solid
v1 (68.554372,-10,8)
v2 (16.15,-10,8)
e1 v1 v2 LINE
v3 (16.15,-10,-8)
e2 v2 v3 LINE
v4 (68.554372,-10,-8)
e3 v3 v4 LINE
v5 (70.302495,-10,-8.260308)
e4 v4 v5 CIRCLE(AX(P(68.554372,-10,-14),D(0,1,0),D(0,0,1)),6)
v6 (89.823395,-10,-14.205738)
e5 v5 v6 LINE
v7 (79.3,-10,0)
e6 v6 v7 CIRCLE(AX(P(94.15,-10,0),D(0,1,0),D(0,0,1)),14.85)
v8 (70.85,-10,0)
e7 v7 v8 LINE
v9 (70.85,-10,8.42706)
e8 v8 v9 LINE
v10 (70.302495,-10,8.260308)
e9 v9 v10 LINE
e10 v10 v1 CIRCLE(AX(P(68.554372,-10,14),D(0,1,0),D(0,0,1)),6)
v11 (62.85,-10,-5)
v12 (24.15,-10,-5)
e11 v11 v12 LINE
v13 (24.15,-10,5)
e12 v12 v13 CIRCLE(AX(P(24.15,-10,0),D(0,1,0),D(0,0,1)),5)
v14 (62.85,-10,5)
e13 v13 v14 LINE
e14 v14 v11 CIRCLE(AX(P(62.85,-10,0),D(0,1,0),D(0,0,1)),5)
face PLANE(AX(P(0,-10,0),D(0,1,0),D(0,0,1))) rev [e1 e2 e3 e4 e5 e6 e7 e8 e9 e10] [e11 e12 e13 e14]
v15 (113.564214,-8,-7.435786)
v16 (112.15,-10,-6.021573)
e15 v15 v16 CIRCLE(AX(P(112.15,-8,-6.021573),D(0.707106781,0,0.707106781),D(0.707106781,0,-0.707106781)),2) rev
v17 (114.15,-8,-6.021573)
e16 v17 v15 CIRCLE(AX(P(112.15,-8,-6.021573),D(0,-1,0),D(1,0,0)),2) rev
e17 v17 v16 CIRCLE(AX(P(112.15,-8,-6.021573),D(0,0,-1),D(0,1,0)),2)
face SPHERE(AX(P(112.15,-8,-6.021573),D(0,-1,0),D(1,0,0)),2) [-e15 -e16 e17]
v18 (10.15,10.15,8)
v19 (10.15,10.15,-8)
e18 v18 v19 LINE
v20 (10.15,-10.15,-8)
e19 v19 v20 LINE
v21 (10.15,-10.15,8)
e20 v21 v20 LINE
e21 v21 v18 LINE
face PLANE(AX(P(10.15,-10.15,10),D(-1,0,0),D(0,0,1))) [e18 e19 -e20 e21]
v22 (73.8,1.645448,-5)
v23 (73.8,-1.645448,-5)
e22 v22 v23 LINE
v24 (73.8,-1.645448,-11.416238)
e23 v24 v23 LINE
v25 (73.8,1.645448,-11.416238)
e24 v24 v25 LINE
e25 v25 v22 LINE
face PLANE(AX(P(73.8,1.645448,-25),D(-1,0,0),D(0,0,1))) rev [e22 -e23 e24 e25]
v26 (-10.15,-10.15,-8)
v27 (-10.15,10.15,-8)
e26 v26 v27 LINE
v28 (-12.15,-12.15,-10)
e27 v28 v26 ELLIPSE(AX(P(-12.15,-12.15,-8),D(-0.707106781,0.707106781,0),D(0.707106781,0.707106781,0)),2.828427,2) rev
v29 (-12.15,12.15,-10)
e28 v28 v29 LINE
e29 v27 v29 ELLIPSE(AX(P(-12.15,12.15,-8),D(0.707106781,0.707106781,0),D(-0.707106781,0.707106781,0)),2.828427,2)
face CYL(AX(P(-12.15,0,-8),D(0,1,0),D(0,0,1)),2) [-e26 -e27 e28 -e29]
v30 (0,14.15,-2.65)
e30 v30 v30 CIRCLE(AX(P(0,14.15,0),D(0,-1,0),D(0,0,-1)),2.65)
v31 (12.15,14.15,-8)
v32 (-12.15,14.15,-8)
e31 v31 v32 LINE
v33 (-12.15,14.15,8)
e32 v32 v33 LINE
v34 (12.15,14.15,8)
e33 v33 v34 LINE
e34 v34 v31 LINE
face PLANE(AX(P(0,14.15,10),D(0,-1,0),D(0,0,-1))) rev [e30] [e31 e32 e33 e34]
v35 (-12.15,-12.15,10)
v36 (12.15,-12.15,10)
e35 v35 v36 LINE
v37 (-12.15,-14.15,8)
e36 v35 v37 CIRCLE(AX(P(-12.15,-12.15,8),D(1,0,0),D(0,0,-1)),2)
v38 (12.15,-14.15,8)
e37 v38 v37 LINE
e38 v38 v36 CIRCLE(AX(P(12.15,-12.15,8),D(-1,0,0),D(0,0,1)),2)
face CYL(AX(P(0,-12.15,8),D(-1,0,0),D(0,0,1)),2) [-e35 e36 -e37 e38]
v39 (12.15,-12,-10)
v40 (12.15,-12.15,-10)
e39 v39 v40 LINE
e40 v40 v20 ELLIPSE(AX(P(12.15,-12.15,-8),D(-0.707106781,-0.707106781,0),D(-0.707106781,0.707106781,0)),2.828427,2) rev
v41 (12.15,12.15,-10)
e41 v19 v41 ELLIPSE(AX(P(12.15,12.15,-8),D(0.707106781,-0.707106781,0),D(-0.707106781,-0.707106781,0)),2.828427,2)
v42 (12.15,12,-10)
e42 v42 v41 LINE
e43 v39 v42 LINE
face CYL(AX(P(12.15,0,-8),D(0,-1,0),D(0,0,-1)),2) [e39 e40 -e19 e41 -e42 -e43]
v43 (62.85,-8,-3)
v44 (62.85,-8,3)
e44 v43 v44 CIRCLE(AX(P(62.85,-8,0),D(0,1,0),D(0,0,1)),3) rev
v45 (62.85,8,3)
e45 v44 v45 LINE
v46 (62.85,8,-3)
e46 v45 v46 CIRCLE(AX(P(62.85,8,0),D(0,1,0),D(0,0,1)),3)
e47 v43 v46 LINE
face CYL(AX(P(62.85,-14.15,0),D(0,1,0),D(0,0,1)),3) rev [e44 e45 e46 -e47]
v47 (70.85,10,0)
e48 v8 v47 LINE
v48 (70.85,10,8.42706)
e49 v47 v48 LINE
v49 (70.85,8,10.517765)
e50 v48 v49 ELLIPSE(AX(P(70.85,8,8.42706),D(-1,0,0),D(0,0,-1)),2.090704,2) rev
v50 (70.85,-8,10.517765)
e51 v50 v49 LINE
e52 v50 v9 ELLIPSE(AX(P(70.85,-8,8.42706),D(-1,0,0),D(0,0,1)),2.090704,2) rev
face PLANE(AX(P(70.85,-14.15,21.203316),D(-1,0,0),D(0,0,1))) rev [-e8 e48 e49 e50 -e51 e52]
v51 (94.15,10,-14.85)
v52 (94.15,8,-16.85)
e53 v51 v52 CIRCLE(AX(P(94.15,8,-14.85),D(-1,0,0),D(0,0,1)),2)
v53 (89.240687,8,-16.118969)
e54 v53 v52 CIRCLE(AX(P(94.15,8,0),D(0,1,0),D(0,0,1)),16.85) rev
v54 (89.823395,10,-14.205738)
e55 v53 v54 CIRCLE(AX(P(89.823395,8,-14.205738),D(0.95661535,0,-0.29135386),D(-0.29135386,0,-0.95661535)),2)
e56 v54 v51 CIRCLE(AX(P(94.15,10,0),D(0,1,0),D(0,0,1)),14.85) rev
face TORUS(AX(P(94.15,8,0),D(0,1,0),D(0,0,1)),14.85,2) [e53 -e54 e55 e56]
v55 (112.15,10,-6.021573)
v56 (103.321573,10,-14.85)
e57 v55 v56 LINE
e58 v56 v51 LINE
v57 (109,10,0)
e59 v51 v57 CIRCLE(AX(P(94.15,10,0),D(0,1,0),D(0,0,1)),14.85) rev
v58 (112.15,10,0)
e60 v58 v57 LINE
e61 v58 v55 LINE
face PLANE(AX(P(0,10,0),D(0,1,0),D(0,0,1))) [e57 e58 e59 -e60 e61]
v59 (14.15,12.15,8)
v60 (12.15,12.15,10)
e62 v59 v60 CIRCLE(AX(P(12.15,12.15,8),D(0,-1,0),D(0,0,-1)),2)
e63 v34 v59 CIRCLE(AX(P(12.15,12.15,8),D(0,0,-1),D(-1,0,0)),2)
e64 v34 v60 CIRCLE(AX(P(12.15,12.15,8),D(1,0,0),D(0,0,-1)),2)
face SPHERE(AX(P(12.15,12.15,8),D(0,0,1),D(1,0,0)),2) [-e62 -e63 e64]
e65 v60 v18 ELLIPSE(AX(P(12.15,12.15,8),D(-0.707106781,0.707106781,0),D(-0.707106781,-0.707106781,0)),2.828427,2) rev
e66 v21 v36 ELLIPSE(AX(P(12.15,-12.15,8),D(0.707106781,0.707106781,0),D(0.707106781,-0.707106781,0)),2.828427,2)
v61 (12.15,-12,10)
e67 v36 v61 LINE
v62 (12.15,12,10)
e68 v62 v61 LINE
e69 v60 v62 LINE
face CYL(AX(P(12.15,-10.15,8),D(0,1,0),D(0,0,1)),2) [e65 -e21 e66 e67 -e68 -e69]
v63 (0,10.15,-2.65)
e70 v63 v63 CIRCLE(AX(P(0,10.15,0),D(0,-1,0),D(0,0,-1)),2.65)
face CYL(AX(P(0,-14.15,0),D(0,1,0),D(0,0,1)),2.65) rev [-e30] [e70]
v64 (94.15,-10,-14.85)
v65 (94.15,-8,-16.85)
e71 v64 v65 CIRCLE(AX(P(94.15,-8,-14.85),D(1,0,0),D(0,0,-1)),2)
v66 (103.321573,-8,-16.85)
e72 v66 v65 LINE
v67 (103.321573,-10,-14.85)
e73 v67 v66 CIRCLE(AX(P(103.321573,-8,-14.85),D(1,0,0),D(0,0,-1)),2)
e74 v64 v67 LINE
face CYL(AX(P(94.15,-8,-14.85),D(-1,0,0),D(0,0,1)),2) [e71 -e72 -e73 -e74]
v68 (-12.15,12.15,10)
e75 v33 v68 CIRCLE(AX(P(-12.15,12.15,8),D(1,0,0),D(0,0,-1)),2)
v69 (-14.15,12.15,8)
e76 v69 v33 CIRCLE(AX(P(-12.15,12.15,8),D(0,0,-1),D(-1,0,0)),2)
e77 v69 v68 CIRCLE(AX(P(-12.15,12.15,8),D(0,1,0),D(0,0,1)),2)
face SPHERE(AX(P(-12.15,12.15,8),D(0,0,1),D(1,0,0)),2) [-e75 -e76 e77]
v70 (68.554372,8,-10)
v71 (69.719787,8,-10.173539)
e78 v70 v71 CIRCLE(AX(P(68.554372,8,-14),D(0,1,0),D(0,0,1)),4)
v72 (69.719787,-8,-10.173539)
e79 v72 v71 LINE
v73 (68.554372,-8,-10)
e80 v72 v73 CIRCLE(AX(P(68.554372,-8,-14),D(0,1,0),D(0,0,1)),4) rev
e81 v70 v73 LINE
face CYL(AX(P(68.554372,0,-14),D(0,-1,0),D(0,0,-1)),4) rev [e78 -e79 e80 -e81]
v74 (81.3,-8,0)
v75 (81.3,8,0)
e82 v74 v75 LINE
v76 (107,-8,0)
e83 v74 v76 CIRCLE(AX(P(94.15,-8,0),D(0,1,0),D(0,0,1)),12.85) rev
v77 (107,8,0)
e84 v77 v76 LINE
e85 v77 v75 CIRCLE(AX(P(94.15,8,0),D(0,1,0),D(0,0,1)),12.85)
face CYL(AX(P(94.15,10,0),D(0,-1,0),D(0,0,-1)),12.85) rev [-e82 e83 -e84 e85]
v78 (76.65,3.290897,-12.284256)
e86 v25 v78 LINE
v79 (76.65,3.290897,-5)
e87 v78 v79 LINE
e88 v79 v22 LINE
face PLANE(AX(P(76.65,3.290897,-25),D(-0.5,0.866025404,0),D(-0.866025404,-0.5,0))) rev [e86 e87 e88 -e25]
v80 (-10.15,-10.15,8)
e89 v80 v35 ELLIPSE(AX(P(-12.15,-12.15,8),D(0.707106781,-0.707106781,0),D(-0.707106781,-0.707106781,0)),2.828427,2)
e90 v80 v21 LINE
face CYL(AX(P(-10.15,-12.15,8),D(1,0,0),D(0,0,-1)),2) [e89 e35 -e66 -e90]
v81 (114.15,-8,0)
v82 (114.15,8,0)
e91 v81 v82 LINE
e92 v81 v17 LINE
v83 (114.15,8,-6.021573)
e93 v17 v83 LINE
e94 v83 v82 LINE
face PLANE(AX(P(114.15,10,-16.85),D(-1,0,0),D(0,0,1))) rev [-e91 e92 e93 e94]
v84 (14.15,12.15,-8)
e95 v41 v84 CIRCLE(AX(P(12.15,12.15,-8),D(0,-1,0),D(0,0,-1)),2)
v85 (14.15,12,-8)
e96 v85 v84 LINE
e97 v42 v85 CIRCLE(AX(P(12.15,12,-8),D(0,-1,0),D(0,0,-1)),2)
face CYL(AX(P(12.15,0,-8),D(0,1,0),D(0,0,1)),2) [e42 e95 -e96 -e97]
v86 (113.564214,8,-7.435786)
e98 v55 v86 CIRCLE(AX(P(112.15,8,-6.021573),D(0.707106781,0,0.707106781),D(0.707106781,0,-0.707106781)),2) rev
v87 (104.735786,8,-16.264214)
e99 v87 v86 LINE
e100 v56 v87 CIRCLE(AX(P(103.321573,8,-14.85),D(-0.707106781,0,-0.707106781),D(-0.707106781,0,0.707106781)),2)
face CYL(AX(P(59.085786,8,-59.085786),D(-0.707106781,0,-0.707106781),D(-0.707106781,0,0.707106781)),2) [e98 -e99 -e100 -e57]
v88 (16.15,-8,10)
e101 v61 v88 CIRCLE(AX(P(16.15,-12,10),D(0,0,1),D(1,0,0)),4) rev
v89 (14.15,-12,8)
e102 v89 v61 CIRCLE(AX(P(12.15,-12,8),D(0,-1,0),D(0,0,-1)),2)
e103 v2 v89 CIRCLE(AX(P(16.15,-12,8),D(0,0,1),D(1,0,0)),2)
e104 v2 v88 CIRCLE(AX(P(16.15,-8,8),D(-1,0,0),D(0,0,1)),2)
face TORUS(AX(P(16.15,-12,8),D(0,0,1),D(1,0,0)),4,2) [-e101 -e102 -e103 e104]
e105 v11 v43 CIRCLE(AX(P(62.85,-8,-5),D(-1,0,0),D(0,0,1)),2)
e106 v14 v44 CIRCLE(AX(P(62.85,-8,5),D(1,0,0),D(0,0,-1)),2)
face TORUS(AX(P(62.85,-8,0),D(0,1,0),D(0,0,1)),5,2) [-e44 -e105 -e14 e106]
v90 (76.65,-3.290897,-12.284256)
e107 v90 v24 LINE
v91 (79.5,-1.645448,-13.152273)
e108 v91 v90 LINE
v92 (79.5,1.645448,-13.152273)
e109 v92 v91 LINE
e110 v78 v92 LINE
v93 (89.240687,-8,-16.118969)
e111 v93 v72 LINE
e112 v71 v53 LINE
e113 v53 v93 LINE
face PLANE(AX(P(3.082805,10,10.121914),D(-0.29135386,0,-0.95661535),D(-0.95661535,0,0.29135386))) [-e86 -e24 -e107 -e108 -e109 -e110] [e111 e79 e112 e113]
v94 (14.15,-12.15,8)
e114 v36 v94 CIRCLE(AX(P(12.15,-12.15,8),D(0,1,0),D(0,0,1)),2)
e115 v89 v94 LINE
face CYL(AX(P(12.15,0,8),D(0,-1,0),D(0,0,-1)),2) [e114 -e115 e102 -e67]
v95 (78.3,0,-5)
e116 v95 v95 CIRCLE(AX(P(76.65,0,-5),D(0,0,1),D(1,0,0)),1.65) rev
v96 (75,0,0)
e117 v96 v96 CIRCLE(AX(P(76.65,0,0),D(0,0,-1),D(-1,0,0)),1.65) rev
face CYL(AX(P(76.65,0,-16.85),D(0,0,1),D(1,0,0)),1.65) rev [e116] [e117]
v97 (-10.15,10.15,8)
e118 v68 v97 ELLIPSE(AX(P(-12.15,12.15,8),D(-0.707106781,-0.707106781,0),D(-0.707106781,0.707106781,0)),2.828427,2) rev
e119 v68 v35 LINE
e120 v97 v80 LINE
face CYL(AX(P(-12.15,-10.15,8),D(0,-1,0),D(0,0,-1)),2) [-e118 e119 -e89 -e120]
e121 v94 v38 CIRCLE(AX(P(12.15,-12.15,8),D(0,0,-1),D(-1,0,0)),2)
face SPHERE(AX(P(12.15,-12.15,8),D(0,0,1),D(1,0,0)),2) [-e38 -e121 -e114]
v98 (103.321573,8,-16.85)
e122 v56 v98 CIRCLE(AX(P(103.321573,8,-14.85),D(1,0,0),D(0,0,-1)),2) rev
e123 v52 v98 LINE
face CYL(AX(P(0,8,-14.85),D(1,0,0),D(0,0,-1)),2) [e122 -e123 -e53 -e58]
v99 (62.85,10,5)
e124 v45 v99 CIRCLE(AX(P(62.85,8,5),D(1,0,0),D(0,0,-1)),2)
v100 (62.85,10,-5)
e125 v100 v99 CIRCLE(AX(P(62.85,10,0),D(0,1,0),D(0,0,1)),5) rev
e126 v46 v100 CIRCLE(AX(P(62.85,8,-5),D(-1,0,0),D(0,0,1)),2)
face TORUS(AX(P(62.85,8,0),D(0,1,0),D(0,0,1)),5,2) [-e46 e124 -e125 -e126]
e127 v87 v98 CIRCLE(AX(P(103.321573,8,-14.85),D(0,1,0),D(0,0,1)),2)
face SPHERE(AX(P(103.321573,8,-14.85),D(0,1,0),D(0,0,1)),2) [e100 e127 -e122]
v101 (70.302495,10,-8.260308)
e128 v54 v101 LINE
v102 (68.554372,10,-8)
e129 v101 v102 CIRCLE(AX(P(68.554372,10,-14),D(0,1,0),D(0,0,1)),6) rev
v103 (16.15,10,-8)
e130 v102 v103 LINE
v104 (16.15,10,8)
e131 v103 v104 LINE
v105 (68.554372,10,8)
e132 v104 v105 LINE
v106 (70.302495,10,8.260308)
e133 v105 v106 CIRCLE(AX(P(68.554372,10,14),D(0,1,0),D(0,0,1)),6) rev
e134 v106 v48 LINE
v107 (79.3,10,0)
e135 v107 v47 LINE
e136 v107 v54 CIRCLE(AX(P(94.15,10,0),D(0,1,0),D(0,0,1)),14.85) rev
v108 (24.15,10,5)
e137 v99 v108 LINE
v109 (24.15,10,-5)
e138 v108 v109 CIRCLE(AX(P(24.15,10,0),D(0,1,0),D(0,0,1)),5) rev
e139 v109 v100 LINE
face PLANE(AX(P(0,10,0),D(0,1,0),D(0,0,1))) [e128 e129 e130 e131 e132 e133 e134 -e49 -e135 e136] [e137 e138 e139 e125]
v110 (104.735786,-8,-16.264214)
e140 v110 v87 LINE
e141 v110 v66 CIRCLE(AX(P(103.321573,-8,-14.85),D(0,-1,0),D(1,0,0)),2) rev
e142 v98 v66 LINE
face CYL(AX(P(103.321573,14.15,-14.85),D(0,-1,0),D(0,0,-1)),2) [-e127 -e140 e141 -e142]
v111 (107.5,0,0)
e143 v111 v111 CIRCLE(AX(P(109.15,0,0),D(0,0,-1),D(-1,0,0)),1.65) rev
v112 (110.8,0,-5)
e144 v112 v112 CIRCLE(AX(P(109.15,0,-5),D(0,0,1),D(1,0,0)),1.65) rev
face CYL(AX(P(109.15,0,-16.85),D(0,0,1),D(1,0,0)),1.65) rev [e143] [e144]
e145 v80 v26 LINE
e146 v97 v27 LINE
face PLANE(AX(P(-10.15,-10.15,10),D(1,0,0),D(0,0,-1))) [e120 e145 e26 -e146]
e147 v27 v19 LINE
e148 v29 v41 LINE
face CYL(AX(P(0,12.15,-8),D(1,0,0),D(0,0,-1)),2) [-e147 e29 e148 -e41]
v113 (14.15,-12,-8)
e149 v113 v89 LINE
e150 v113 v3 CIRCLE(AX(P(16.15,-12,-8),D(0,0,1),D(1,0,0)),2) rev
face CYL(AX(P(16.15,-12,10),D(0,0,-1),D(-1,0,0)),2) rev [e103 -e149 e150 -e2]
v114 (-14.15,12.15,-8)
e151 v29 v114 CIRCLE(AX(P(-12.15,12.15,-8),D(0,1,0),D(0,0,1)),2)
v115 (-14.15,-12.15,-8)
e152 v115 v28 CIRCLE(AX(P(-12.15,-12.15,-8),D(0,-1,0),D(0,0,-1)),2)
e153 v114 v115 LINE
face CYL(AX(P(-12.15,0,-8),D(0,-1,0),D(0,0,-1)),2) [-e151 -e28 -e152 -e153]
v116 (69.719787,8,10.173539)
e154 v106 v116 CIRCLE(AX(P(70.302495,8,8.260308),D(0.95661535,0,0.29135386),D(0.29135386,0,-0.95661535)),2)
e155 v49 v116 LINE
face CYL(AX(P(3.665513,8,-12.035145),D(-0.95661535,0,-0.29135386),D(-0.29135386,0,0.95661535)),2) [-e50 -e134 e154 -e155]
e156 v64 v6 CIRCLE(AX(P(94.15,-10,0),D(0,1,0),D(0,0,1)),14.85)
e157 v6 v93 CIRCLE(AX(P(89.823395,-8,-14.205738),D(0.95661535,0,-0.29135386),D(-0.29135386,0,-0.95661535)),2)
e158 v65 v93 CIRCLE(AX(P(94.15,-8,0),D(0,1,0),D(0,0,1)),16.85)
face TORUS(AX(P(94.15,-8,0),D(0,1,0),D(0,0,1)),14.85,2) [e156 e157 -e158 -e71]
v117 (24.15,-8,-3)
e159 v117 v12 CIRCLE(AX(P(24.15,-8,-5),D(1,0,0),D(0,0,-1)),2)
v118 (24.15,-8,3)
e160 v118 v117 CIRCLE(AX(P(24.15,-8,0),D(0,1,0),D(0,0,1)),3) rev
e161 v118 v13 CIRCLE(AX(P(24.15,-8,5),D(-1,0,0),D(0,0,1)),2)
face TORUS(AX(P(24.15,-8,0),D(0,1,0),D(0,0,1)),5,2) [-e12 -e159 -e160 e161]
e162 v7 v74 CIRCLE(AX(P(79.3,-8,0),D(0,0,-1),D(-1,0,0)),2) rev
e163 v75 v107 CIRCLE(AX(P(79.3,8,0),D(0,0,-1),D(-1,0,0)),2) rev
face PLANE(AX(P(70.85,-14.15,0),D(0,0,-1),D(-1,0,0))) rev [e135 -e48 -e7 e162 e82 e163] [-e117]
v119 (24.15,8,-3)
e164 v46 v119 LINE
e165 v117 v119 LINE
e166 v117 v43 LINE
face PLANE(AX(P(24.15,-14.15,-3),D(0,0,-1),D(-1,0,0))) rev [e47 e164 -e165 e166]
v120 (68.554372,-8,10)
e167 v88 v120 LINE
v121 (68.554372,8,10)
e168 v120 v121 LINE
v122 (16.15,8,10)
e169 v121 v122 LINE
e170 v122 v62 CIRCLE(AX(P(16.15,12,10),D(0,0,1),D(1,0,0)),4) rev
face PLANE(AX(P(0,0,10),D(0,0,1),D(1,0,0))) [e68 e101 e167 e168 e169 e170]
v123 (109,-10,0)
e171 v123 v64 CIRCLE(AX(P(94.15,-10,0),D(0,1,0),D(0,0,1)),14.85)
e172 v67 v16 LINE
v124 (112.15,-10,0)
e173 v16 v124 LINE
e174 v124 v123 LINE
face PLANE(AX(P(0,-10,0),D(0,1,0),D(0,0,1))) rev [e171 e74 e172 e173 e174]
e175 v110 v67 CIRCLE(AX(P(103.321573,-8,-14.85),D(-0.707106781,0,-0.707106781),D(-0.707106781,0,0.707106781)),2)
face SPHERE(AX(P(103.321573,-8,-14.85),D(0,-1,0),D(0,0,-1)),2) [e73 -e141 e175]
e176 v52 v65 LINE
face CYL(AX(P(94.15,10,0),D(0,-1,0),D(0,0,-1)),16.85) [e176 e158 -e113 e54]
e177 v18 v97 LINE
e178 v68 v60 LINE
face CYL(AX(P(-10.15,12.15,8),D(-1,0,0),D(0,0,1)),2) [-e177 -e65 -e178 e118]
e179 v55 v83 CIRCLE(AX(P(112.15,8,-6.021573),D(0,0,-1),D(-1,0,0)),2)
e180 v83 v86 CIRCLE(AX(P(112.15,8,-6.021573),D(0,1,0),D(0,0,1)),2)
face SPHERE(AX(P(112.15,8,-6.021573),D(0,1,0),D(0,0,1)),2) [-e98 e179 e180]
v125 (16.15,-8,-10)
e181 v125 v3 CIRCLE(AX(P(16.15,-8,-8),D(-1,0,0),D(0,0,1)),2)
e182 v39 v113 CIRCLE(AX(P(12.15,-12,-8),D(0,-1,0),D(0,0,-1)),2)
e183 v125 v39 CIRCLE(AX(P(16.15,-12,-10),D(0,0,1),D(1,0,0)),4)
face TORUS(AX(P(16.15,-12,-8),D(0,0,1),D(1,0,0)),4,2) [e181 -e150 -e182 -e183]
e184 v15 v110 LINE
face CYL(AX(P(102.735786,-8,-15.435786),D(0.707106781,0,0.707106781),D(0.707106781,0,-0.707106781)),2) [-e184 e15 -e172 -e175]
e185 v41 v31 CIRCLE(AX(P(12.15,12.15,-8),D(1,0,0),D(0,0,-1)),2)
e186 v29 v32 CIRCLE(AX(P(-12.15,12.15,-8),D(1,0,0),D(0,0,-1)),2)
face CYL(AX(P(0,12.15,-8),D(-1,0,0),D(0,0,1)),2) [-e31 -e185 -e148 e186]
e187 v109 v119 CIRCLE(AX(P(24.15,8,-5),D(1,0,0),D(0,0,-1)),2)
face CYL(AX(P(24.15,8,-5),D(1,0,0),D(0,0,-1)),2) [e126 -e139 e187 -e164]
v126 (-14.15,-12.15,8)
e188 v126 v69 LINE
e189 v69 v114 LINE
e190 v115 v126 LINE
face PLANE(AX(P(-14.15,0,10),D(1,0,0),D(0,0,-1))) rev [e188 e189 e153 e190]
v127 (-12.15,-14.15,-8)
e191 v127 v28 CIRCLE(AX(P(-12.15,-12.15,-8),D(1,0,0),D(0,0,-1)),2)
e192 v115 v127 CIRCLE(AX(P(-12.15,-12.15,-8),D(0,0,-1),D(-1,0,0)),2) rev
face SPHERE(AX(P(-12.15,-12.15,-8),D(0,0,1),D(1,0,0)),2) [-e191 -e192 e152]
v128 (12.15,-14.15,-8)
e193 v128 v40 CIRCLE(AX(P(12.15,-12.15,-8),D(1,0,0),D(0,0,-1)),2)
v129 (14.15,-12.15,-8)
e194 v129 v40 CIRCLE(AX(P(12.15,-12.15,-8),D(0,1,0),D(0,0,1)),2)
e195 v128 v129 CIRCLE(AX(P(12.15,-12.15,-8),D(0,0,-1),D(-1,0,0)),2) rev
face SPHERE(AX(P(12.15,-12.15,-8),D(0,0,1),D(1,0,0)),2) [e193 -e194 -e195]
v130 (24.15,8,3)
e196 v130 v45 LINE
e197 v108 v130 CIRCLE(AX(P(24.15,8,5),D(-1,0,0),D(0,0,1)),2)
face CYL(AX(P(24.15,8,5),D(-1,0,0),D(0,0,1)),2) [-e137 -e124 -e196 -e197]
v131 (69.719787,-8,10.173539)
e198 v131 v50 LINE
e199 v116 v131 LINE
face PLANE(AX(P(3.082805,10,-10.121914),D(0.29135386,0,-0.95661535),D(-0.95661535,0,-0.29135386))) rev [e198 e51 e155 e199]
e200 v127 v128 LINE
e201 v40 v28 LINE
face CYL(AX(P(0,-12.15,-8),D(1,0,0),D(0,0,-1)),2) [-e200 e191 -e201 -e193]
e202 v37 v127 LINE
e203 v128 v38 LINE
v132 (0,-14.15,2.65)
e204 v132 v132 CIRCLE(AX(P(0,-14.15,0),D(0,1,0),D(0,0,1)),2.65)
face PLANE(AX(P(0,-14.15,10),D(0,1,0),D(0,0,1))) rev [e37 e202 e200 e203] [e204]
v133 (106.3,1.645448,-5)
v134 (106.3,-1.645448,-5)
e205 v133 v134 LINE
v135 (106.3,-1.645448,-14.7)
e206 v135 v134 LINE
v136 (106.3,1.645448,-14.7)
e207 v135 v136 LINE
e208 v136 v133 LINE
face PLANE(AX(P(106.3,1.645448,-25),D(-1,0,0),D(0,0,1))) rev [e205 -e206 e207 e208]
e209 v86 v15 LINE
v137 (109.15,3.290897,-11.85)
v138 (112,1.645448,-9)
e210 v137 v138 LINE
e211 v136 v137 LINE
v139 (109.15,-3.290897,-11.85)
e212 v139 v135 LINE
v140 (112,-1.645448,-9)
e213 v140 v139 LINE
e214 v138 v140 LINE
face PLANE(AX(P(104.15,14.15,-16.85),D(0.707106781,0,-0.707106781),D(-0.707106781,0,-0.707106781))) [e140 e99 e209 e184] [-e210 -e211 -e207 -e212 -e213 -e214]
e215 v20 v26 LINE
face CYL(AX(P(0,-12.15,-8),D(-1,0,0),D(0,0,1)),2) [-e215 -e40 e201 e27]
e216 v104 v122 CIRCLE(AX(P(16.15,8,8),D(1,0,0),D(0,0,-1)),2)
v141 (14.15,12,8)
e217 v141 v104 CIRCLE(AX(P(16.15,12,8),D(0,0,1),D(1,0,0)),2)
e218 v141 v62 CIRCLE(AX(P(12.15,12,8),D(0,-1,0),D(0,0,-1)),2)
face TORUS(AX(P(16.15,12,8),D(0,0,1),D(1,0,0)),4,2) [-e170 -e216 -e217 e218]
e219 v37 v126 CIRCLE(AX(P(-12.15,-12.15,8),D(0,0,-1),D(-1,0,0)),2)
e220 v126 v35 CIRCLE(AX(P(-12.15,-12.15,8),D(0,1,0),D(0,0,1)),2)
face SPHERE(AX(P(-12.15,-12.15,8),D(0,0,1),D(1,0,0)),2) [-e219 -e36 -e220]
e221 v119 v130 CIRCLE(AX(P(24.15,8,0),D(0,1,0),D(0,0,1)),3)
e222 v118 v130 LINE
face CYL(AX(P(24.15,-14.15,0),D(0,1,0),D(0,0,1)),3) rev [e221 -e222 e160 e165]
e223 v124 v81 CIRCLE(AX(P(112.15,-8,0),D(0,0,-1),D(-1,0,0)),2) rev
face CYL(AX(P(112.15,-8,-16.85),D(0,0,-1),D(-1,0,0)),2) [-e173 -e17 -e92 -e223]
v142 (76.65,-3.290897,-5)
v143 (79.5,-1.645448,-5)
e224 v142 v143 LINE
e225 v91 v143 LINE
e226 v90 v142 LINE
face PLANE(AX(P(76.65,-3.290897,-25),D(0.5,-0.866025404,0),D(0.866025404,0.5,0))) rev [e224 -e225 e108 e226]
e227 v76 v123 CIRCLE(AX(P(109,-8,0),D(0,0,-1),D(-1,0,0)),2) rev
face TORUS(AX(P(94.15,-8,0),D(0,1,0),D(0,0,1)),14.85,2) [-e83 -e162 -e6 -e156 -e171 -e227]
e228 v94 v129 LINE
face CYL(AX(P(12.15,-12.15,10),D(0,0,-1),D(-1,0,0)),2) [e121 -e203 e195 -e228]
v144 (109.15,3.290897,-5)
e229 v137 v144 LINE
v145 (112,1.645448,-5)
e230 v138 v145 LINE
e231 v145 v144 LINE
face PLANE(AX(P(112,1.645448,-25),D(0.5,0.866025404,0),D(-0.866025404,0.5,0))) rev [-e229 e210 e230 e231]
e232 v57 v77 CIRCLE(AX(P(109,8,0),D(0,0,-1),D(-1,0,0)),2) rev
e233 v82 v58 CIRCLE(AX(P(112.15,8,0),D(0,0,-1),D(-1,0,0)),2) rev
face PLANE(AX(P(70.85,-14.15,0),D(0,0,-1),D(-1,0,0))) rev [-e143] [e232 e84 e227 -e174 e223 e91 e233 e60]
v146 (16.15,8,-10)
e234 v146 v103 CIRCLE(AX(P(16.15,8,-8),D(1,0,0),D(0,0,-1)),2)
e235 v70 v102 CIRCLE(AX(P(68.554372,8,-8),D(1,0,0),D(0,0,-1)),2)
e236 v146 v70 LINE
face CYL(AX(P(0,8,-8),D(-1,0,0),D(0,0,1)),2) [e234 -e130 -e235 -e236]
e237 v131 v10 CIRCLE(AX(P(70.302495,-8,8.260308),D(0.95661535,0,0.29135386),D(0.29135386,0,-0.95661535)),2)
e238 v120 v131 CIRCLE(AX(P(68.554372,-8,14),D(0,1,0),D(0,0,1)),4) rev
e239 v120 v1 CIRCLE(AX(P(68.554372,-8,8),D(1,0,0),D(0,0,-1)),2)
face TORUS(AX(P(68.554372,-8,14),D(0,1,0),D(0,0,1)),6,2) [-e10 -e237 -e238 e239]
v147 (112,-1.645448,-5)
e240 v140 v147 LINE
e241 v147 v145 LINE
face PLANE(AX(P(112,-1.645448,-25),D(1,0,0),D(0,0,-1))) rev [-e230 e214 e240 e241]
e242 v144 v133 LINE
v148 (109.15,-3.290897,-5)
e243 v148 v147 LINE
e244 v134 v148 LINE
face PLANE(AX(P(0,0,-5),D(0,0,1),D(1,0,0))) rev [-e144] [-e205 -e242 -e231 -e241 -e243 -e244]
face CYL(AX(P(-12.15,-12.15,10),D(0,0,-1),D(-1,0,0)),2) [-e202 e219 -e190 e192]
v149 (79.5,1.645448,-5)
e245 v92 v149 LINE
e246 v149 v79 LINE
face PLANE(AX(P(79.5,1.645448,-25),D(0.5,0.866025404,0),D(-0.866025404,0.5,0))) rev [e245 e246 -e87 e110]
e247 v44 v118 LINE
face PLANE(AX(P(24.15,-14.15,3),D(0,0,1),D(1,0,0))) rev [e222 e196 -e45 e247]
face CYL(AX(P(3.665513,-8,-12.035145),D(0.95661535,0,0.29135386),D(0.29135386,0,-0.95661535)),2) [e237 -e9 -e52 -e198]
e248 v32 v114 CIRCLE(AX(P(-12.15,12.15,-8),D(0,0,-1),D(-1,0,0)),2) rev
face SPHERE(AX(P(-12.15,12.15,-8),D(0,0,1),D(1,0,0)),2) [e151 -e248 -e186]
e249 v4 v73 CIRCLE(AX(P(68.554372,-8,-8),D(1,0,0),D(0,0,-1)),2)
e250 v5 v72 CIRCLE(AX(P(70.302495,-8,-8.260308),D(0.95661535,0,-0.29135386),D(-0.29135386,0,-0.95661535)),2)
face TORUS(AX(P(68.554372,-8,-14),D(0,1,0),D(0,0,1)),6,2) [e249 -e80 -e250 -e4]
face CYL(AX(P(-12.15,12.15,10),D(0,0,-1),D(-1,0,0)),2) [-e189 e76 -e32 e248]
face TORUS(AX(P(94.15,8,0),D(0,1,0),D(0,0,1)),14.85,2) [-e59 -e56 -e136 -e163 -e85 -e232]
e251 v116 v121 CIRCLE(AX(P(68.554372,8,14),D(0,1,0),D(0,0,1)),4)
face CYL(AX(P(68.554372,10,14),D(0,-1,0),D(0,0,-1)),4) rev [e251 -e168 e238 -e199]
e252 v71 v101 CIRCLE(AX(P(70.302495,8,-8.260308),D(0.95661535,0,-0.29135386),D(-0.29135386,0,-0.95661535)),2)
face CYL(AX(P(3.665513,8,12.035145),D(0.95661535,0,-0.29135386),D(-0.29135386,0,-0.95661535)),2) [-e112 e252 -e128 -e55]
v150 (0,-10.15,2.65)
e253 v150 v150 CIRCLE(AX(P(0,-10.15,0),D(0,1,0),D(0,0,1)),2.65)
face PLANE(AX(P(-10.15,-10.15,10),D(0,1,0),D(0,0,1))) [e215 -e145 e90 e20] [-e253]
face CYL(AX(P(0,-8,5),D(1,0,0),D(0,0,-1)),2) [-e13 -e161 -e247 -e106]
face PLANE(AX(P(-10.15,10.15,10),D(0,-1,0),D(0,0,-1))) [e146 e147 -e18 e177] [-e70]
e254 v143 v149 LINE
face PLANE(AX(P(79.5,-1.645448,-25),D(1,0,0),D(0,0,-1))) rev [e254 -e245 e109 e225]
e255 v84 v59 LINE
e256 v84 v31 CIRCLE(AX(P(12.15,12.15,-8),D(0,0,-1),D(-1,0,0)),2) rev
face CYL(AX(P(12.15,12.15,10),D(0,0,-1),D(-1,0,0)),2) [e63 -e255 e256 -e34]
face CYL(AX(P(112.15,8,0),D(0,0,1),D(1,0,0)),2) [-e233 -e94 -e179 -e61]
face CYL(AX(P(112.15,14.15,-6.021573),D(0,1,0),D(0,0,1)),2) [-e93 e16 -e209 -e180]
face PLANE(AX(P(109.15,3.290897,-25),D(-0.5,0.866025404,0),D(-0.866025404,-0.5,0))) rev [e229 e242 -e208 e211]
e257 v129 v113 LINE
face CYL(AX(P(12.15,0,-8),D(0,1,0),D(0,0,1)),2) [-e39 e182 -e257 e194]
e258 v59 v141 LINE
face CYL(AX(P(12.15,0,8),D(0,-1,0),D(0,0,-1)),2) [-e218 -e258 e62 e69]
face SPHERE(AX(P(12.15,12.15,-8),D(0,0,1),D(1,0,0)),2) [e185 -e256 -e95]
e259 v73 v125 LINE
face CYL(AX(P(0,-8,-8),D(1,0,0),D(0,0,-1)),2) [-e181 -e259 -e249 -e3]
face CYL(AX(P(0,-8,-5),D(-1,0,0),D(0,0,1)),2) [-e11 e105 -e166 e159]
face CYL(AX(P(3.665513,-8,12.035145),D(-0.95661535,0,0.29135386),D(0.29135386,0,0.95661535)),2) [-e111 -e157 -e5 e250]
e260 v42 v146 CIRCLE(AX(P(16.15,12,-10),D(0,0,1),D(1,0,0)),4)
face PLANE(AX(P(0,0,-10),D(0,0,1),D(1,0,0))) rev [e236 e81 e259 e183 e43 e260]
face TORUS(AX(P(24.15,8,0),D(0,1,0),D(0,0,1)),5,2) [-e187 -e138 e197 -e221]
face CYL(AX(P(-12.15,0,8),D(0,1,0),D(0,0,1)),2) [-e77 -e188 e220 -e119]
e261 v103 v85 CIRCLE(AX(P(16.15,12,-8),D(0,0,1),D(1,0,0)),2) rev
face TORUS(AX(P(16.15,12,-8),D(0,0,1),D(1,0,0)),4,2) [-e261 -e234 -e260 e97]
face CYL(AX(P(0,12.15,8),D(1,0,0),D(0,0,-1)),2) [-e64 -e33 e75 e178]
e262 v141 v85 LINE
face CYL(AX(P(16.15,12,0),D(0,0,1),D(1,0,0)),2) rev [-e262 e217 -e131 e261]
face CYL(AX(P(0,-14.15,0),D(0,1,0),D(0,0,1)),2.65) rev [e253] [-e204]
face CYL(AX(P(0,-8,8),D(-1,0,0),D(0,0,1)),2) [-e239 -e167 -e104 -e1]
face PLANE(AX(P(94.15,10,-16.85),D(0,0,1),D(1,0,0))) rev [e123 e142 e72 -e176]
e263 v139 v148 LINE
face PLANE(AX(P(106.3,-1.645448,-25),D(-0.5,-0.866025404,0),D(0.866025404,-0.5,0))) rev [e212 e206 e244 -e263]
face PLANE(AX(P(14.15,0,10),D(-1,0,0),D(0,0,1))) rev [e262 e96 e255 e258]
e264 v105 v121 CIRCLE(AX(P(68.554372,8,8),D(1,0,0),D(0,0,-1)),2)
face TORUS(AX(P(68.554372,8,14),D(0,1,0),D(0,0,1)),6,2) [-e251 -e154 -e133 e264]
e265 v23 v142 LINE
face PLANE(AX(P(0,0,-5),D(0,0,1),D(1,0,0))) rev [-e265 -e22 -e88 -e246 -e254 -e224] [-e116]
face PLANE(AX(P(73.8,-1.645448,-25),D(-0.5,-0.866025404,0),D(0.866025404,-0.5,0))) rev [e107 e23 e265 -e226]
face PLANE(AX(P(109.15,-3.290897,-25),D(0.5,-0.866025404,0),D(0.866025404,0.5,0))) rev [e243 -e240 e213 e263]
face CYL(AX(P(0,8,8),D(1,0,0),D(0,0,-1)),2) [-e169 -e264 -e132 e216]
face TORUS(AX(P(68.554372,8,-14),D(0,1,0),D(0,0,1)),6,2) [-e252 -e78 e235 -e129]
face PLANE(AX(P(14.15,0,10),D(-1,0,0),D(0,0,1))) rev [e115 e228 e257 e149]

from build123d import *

# Parameters (mm, degrees)
SKETCH1_W               = 28.3
SKETCH1_H               = 28.3
SKETCH1_W_2             = 20.3
SKETCH1_H_2             = 20.3
EXTRUDE_THIN1_DEPTH     = 10
SKETCH2_W               = 55
SKETCH2_H               = 20
SKETCH2_R               = 12.85
BOSS_EXTRUDE4_DEPTH     = 10
BOSS_EXTRUDE5_DEPTH     = 10
CUT_EXTRUDE1_DEPTH      = 117.251311821
CUT_EXTRUDE1_DEPTH_BACK = 117.251311821
CUT_EXTRUDE2_DEPTH      = 117.251311821
CUT_EXTRUDE2_DEPTH_BACK = 117.251311821
SKETCH5_R               = 1.65
FILLET1_R               = 2
FILLET2_R               = 4
FILLET3_R               = 2
CUT_EXTRUDE4_DEPTH      = 119.806712773
CUT_EXTRUDE4_DEPTH_BACK = 119.806712773
SKETCH6_R               = 2.65
CUT_EXTRUDE5_START      = 6
SKETCH7_R               = 3
CUT_EXTRUDE5_DEPTH      = 20
CUT_EXTRUDE6_START      = -5
CUT_EXTRUDE6_DEPTH      = 20
CUT_EXTRUDE7_DEPTH      = 117.251311821
CUT_EXTRUDE7_DEPTH_BACK = 117.251311821
SKETCH9_W               = 43.3
SKETCH9_H               = 21.20331566
CUT_EXTRUDE8_DEPTH      = 118.887096507
CUT_EXTRUDE8_DEPTH_BACK = 118.887096507
FILLET4_R               = 2


with BuildPart() as part:
    # Sketch1 → Extrude-Thin1 (new, symmetric)
    with BuildSketch(Plane.XY):
        Rectangle(SKETCH1_W, SKETCH1_H)
        Rectangle(SKETCH1_W_2, SKETCH1_H_2, mode=Mode.SUBTRACT)
    extrude(amount=EXTRUDE_THIN1_DEPTH, both=True)

    # Sketch2 → Boss-Extrude4 (add, symmetric)
    # profile 1 of 2: a face of its own
    with BuildSketch(Plane(origin=(0, 0, 0), x_dir=(1, 0, 0), z_dir=(0, 1, 0))):
        with Locations((41.65, 0)):
            Rectangle(SKETCH2_W, SKETCH2_H)
    # profile 2 of 2: a face of its own
    with BuildSketch(Plane(origin=(0, 0, 0), x_dir=(1, 0, 0), z_dir=(0, 1, 0))):
        with BuildLine():
            Line((69.15, -10), (89.240687461, -16.118968652))
            ThreePointArc((89.240687461, -16.118968652), (111, 0), (89.240687461, 16.118968652))
            Line((89.240687461, 16.118968652), (69.15, 10))
            Line((69.15, 10), (69.15, -10))
        make_face()
        with Locations(Location((94.15, 0, 0), (0, 0, 270))):
            Circle(SKETCH2_R, mode=Mode.SUBTRACT)
    extrude(amount=BOSS_EXTRUDE4_DEPTH, both=True)

    # Sketch3 → Boss-Extrude5 (add, symmetric)
    with BuildSketch(Plane(origin=(0, 0, 0), x_dir=(1, 0, 0), z_dir=(0, 1, 0))):
        with BuildLine():
            Line((94.15, 16.85), (114.15, 16.85))
            Line((114.15, 16.85), (114.15, -16.85))
            Line((114.15, -16.85), (94.15, -16.85))
            ThreePointArc((94.15, -16.85), (111, 0), (94.15, 16.85))
        make_face()
    extrude(amount=BOSS_EXTRUDE5_DEPTH, both=True)

    # Sketch4 → Cut-Extrude1 (cut, two sides: drawn at the far end of the back side and taken through both)
    with BuildSketch(Plane.XZ.offset(-CUT_EXTRUDE1_DEPTH_BACK)):
        Polygon((104.15, 16.85), (114.15, 16.85), (114.15, 6.85), align=None)
        Polygon((114.15, -16.85), (104.15, -16.85), (114.15, -6.85), align=None)
    extrude(amount=CUT_EXTRUDE1_DEPTH + CUT_EXTRUDE1_DEPTH_BACK, mode=Mode.SUBTRACT)

    # Sketch5 → Cut-Extrude2 (cut, two sides: drawn at the far end of the back side and taken through both)
    with BuildSketch(Plane.XY.offset(-CUT_EXTRUDE2_DEPTH_BACK)):
        with Locations((109.15, 0)):
            Circle(SKETCH5_R)
        with Locations((76.65, 0)):
            Circle(SKETCH5_R)
    extrude(amount=CUT_EXTRUDE2_DEPTH + CUT_EXTRUDE2_DEPTH_BACK, mode=Mode.SUBTRACT)

    # Fillet1
    fillet1_edges = [part.edges().sort_by_distance(p)[0] for p in [
        (14.15, -10, 0),
        (14.15, 10, 0),
        (14.15, -14.15, 0),
        (-14.15, -14.15, 0),
        (-14.15, 14.15, 0),
        (14.15, 14.15, 0),
    ]]
    fillet(fillet1_edges, radius=FILLET1_R)

    # Fillet2
    fillet2_edges = [part.edges().sort_by_distance(p)[0] for p in [
        (69.15, 0, 10),
        (69.15, 0, -10),
    ]]
    fillet(fillet2_edges, radius=FILLET2_R)

    # Fillet3
    fillet3_edges = [part.edges().sort_by_distance(p)[0] for p in [
        (14.15, -12.075, -10),
        (14.15, -12.075, 10),
        (42.352185859, -10, 10),
        (42.352185859, -10, -10),
        (42.352185859, 10, -10),
        (42.352185859, 10, 10),
        (14.15, 12.075, -10),
        (14.15, 12.075, 10),
        (0, -14.15, -10),
        (-14.15, 0, -10),
        (0, 14.15, -10),
        (13.564213562, 13.564213562, -10),
        (-13.564213562, 13.564213562, -10),
        (-13.564213562, -13.564213562, -10),
        (13.564213562, -13.564213562, -10),
        (0, -14.15, 10),
        (0, 14.15, 10),
        (-14.15, 0, 10),
        (13.564213562, 13.564213562, 10),
        (-13.564213562, 13.564213562, 10),
        (-13.564213562, -13.564213562, 10),
        (13.564213562, -13.564213562, 10),
        (14.735786438, -10.585786438, 10),
        (14.735786438, -10.585786438, -10),
        (14.735786438, 10.585786438, 10),
        (14.735786438, 10.585786438, -10),
        (10.15, 0, -10),
        (0, 10.15, -10),
        (-10.15, 0, -10),
        (0, -10.15, -10),
        (10.15, 0, 10),
        (79.480237309, -10, -13.146253625),
        (79.480237309, 10, -13.146253625),
        (0, 10.15, 10),
        (79.480237309, -10, 13.146253625),
        (79.480237309, 10, 13.146253625),
        (69.143504299, -10, -10.043622515),
        (-10.15, 0, 10),
        (69.143504299, 10, -10.043622515),
        (69.143504299, -10, 10.043622515),
        (69.143504299, 10, 10.043622515),
        (0, -10.15, 10),
        (91.668279002, -10, 16.666240155),
        (94.15, 10, -12.85),
        (91.668279002, 10, 16.666240155),
        (94.15, -10, -12.85),
        (91.668279002, -10, -16.666240155),
        (91.668279002, 10, -16.666240155),
        (99.15, -10, 16.85),
        (99.15, 10, 16.85),
        (99.15, -10, -16.85),
        (99.15, 10, -16.85),
        (104.15, 0, -16.85),
        (114.15, -10, 0),
        (114.15, 10, 0),
        (114.15, 0, 6.85),
        (109.15, 10, 11.85),
        (104.15, 0, 16.85),
        (109.15, -10, 11.85),
        (109.15, 10, -11.85),
        (114.15, 0, -6.85),
        (109.15, -10, -11.85),
    ]]
    fillet(fillet3_edges, radius=FILLET3_R - 0.0001)  # a hair under: the kernel refuses the full size

    # Sketch6 → Cut-Extrude4 (cut, two sides: drawn at the far end of the back side and taken through both)
    with BuildSketch(Plane(origin=(0, 14.15, 0), x_dir=(1, 0, 0), z_dir=(0, 1, 0)).offset(-CUT_EXTRUDE4_DEPTH_BACK)):
        with Locations(Location((0, 0, 0), (0, 0, 270))):
            Circle(SKETCH6_R)
    extrude(amount=CUT_EXTRUDE4_DEPTH + CUT_EXTRUDE4_DEPTH_BACK, mode=Mode.SUBTRACT)

    # Sketch7 → Cut-Extrude5 (cut)
    with BuildSketch(Plane.XY.offset(CUT_EXTRUDE5_START)):
        with Locations((109.15, 0)):
            Circle(SKETCH7_R)
        with Locations(Location((76.65, 0, 0), (0, 0, 180))):
            Circle(SKETCH7_R)
    extrude(amount=CUT_EXTRUDE5_DEPTH, mode=Mode.SUBTRACT)

    # Sketch8 → Cut-Extrude6 (cut)
    with BuildSketch(Plane.XY.offset(CUT_EXTRUDE6_START)):
        Polygon((76.65, 3.290896534), (73.8, 1.645448267), (73.8, -1.645448267), (76.65, -3.290896534), (79.5, -1.645448267), (79.5, 1.645448267), align=None)
        Polygon((109.15, 3.290896534), (106.3, 1.645448267), (106.3, -1.645448267), (109.15, -3.290896534), (112, -1.645448267), (112, 1.645448267), align=None)
    extrude(amount=-CUT_EXTRUDE6_DEPTH, mode=Mode.SUBTRACT)

    # Sketch9 → Cut-Extrude7 (cut, two sides: drawn at the far end of the back side and taken through both)
    with BuildSketch(Plane(origin=(0, 0, 0), x_dir=(1, 0, 0), z_dir=(0, 1, 0)).offset(-CUT_EXTRUDE7_DEPTH_BACK)):
        with Locations((92.5, -10.60165783)):
            Rectangle(SKETCH9_W, SKETCH9_H)
    extrude(amount=CUT_EXTRUDE7_DEPTH + CUT_EXTRUDE7_DEPTH_BACK, mode=Mode.SUBTRACT)

    # Sketch10 → Cut-Extrude8 (cut, two sides: drawn at the far end of the back side and taken through both)
    with BuildSketch(Plane(origin=(0, 10, 0), x_dir=(1, 0, 0), z_dir=(0, 1, 0)).offset(-CUT_EXTRUDE8_DEPTH_BACK)):
        with BuildLine():
            Line((24.15, 3), (62.85, 3))
            ThreePointArc((62.85, 3), (65.85, 0), (62.85, -3))
            Line((62.85, -3), (24.15, -3))
            ThreePointArc((24.15, -3), (21.15, 0), (24.15, 3))
        make_face()
    extrude(amount=CUT_EXTRUDE8_DEPTH + CUT_EXTRUDE8_DEPTH_BACK, mode=Mode.SUBTRACT)

    # Fillet4
    fillet4_edges = [part.edges().sort_by_distance(p)[0] for p in [
        (43.5, -10, 3),
        (65.85, -10, 0),
        (43.5, -10, -3),
        (21.15, -10, 0),
        (21.15, 10, 0),
        (43.5, 10, -3),
        (65.85, 10, 0),
        (43.5, 10, 3),
    ]]
    fillet(fillet4_edges, radius=FILLET4_R)


solid = part.part
